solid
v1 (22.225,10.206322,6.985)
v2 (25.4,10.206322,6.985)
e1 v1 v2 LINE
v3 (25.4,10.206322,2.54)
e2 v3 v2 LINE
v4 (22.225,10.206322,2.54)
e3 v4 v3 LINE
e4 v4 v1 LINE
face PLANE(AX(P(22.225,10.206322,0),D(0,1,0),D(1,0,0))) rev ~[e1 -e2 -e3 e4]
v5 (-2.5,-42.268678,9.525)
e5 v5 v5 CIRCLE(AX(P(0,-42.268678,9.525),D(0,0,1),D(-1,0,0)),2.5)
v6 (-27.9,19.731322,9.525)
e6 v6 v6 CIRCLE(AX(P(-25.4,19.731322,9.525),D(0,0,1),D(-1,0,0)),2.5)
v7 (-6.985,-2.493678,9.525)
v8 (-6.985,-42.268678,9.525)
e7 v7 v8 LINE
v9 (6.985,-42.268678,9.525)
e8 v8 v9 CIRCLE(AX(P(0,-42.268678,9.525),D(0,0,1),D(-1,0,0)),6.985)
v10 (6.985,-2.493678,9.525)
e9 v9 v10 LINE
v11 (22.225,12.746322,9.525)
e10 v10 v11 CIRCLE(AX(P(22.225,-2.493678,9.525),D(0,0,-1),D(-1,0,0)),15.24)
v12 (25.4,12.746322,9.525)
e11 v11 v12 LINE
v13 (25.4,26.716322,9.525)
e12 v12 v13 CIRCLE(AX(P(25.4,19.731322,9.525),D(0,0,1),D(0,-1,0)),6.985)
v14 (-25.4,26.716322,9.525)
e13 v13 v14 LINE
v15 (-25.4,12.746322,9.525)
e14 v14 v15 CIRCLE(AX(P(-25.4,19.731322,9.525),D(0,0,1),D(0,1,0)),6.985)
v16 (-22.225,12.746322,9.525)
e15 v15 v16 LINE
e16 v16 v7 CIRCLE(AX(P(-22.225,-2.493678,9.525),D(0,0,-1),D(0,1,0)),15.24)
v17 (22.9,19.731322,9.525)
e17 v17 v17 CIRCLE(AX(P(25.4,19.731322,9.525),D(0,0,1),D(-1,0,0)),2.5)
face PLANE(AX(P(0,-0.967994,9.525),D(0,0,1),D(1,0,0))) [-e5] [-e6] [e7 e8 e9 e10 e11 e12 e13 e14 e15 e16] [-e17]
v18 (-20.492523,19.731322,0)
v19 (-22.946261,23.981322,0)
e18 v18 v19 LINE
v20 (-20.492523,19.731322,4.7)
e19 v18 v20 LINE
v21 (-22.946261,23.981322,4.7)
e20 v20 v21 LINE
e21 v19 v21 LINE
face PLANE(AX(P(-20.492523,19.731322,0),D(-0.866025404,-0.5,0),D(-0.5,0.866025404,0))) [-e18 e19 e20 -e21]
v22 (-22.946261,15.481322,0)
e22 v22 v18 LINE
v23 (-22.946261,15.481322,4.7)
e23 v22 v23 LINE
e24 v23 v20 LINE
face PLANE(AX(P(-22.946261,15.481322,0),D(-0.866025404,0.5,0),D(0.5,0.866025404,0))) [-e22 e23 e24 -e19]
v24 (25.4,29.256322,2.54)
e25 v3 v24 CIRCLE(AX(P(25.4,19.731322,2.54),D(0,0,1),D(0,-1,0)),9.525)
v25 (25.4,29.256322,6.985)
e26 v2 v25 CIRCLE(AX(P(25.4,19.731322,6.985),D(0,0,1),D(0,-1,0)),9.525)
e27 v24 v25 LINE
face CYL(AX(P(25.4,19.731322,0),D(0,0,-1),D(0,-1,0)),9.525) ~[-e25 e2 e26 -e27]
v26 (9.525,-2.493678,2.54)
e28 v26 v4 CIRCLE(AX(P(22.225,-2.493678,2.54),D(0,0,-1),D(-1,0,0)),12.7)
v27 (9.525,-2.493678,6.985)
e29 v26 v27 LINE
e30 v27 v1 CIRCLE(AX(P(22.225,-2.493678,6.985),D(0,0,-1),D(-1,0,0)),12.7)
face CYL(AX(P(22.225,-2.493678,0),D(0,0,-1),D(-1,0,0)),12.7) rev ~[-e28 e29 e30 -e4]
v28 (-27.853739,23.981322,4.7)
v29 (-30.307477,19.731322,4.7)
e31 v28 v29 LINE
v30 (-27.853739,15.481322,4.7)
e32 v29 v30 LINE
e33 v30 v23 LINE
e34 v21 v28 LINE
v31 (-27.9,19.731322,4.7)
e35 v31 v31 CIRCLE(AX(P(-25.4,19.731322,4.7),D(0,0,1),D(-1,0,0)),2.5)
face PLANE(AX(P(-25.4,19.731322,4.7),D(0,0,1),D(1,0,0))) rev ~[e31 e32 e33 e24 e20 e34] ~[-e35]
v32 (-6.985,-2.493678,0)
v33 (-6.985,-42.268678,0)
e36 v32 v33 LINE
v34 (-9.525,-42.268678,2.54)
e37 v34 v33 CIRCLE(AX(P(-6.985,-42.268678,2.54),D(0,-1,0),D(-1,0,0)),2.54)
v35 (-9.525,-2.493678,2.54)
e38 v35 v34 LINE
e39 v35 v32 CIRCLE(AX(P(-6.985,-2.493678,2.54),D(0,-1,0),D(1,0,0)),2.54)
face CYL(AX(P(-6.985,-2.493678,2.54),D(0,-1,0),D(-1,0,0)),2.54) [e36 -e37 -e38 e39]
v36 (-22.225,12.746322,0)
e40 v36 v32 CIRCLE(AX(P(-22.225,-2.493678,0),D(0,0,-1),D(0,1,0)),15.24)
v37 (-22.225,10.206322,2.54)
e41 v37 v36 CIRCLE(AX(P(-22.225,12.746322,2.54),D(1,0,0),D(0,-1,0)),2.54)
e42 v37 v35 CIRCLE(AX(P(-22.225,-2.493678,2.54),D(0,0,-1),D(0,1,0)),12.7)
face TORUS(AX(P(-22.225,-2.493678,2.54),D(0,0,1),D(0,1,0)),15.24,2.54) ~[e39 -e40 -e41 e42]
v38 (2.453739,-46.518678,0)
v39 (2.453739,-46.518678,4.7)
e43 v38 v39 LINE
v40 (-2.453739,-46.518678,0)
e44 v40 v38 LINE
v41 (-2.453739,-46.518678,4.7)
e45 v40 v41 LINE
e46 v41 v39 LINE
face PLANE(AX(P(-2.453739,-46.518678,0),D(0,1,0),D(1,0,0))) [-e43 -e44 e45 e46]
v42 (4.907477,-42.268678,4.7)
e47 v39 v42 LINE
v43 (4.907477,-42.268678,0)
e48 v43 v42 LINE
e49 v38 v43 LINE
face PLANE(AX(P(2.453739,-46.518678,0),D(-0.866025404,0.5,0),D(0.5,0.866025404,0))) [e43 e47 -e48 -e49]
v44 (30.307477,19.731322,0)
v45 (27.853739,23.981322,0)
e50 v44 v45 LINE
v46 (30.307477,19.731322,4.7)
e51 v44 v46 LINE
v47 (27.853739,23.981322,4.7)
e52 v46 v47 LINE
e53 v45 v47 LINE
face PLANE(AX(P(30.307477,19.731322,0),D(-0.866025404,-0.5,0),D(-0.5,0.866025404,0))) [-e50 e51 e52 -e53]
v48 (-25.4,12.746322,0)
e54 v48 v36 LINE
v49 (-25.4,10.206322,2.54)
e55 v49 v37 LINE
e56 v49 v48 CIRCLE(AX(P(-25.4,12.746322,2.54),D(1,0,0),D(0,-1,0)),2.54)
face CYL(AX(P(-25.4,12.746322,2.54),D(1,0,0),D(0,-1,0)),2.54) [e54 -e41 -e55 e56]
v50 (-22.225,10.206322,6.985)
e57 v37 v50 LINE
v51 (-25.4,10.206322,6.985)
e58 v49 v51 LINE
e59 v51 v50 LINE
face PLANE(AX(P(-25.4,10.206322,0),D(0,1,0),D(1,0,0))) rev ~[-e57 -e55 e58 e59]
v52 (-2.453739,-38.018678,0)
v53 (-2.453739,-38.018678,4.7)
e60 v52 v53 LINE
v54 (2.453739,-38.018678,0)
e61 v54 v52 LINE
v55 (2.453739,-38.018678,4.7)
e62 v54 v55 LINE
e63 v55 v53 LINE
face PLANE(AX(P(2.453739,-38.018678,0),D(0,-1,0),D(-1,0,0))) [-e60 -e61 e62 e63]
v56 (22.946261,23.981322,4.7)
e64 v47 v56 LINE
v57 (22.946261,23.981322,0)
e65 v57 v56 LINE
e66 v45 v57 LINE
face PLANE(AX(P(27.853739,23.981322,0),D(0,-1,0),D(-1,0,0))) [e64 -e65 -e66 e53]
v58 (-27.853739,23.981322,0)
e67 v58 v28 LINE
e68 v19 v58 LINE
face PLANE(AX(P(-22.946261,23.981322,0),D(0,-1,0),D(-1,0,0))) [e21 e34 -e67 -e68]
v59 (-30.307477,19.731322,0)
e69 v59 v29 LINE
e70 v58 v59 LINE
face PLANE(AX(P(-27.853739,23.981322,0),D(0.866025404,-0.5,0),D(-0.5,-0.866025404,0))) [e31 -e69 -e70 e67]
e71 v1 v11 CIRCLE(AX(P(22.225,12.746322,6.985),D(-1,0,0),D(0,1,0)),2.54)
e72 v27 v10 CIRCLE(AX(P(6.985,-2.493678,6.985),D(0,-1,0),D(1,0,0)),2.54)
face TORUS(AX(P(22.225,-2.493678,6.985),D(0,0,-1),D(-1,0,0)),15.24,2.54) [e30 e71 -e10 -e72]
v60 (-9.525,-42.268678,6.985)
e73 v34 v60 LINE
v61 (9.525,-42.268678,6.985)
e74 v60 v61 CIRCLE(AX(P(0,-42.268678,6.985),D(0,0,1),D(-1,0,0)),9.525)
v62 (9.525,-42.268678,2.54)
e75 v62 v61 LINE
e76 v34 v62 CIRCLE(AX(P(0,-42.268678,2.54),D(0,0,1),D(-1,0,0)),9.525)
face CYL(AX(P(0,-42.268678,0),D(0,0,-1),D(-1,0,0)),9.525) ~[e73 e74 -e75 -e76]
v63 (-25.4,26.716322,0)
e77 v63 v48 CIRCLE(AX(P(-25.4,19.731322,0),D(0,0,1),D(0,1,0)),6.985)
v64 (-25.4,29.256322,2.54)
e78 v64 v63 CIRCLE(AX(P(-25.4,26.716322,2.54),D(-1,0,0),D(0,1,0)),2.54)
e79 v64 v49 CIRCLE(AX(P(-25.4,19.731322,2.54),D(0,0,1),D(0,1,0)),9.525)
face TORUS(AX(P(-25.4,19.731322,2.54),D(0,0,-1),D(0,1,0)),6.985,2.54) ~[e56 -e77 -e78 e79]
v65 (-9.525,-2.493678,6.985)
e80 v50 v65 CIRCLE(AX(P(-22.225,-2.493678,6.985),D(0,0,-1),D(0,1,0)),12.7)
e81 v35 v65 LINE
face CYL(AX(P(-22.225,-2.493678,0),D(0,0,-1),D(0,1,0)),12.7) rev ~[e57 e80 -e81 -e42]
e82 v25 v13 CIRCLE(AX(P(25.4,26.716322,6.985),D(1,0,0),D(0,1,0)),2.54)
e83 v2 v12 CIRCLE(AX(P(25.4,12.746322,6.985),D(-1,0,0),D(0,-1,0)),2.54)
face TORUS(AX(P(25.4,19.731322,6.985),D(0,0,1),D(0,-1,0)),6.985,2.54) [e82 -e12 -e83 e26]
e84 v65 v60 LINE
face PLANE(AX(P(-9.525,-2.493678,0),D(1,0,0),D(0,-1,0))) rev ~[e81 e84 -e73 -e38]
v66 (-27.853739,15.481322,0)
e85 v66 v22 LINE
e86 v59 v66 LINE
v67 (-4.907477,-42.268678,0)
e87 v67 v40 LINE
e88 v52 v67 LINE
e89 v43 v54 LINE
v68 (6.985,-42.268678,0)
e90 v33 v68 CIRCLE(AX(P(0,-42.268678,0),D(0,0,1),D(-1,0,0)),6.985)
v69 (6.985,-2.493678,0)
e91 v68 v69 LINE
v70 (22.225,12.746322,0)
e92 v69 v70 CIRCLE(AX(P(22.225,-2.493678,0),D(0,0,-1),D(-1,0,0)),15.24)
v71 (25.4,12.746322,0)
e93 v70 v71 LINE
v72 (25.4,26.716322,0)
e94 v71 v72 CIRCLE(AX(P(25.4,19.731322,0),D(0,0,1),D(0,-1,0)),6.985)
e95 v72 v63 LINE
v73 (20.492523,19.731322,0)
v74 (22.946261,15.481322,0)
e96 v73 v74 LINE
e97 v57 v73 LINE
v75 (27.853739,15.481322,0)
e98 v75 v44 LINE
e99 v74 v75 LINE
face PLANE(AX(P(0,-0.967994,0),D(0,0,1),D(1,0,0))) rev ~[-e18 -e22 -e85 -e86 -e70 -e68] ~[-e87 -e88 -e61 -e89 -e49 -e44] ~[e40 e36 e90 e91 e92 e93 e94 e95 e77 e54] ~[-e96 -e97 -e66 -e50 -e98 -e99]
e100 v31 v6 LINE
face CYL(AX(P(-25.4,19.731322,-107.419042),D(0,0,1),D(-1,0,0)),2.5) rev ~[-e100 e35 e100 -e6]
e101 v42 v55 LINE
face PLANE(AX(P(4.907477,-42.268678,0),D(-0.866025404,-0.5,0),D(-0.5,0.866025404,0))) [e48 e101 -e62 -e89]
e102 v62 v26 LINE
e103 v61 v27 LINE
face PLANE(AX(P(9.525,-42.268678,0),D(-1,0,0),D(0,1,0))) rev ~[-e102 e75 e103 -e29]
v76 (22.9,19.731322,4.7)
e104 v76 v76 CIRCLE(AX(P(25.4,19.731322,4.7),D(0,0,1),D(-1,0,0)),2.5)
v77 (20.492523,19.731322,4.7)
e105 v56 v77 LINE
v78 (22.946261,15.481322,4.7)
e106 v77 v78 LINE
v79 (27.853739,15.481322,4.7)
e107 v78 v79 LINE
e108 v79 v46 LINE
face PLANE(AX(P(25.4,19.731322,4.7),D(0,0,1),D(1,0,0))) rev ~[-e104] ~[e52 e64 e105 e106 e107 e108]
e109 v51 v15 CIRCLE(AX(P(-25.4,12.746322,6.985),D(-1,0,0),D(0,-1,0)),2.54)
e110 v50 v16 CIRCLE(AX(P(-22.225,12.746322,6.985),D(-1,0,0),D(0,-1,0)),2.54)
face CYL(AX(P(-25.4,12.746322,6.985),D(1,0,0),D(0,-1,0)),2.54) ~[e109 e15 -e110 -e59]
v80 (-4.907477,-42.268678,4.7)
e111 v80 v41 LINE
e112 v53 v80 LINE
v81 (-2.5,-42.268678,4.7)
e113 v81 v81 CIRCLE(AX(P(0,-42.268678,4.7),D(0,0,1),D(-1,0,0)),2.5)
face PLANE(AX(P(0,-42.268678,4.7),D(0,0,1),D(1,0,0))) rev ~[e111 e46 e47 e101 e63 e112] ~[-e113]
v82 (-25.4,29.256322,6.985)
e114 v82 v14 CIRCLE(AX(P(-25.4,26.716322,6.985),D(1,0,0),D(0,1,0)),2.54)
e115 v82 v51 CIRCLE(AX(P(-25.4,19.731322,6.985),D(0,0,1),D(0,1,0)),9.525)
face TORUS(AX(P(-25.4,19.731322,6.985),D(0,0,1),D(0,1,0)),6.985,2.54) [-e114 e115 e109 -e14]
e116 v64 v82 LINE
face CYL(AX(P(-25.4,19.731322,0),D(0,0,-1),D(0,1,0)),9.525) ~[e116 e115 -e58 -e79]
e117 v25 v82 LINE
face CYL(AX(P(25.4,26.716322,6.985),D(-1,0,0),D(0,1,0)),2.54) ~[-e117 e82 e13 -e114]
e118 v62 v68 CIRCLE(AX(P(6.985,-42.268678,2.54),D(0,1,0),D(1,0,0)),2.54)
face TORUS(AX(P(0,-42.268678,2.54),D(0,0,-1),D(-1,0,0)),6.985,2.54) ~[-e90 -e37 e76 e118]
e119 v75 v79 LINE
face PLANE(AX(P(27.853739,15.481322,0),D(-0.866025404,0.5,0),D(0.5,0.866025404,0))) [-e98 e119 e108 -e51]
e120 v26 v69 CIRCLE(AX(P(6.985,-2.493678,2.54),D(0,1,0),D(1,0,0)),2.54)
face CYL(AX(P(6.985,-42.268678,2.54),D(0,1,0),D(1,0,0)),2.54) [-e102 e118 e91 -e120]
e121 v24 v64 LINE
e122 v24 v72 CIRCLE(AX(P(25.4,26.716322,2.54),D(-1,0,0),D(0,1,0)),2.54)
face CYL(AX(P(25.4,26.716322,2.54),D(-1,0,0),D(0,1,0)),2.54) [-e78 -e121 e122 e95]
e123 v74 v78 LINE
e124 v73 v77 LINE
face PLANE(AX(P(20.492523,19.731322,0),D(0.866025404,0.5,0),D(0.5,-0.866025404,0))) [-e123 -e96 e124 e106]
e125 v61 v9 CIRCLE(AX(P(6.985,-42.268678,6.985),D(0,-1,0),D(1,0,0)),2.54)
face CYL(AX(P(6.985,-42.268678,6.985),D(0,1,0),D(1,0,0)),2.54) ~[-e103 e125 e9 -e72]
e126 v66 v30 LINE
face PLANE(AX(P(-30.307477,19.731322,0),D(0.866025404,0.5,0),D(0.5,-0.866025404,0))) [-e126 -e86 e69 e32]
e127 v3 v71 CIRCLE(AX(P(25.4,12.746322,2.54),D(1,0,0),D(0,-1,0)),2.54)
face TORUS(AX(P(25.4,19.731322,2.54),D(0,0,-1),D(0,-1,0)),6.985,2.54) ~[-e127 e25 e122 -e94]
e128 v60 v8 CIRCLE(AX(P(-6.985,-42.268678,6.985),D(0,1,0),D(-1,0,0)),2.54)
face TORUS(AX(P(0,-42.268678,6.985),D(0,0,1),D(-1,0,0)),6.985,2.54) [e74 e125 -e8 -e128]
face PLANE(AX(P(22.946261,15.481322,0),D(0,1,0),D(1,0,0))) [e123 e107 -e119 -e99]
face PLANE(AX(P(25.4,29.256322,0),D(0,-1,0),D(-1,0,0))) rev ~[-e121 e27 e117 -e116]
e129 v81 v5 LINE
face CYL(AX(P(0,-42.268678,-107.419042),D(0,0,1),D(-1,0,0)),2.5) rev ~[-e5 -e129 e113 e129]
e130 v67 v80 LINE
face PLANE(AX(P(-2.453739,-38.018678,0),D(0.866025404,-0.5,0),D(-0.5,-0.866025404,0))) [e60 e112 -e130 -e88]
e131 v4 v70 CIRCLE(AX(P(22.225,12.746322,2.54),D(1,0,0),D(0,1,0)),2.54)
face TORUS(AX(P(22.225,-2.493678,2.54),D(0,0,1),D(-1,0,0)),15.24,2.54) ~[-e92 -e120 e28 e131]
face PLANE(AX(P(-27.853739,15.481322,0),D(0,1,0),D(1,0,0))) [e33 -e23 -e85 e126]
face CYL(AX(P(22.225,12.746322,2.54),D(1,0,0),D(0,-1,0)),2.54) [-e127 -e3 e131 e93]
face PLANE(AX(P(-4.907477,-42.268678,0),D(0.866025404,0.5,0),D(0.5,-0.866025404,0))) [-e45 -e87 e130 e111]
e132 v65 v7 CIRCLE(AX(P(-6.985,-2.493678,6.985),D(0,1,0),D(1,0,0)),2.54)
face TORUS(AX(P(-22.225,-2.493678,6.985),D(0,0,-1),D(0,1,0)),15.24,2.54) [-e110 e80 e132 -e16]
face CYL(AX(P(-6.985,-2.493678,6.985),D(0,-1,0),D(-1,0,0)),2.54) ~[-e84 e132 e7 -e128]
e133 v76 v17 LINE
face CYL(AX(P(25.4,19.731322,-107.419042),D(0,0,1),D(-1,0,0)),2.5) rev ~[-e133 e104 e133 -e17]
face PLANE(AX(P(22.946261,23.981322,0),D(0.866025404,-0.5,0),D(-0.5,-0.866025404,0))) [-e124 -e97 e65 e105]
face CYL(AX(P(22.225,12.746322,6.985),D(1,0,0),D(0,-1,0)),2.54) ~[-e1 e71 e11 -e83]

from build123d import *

# Parameters (mm, degrees)
F1_DEPTH = 9.525
F2_D     = 5
F3_R     = 2.54
F4_DEPTH = 4.7


# Not quite as in the source:
# - a feature names something its author has since deleted; it is built from what else it names


with BuildPart() as f1:
    # F0 (on Top) → F1 (new body)
    with BuildSketch(Plane.XY):
        with BuildLine():
            Line((25.4, 29.2563221224), (-25.4, 29.2563221224))
            ThreePointArc((-25.4, 29.2563221224), (-34.925, 19.7313221224), (-25.4, 10.2063221224))
            Line((-25.4, 10.2063221224), (-22.225, 10.2063221224))
            ThreePointArc((-22.225, 10.2063221224), (-13.2447438789, 6.4865782435), (-9.525, -2.4936778776))
            Line((-9.525, -2.4936778776), (-9.525, -42.2686778776))
            ThreePointArc((-9.525, -42.2686778776), (0, -51.7936778776), (9.525, -42.2686778776))
            Line((9.525, -42.2686778776), (9.525, -2.4936778776))
            ThreePointArc((9.525, -2.4936778776), (13.2447438789, 6.4865782435), (22.225, 10.2063221224))
            Line((22.225, 10.2063221224), (25.4, 10.2063221224))
            ThreePointArc((25.4, 10.2063221224), (34.925, 19.7313221224), (25.4, 29.2563221224))
        make_face()
        Polygon((-4.9074772881, -42.2686778776), (-2.4537386441, -38.0186778776), (2.4537386441, -38.0186778776), (4.9074772881, -42.2686778776), (2.4537386441, -46.5186778776), (-2.4537386441, -46.5186778776), align=None, mode=Mode.SUBTRACT)
        Polygon((-20.4925227119, 19.7313221224), (-22.9462613559, 15.4813221224), (-27.8537386441, 15.4813221224), (-30.3074772881, 19.7313221224), (-27.8537386441, 23.9813221224), (-22.9462613559, 23.9813221224), align=None, mode=Mode.SUBTRACT)
        Polygon((30.3074772881, 19.7313221224), (27.8537386441, 15.4813221224), (22.9462613559, 15.4813221224), (20.4925227119, 19.7313221224), (22.9462613559, 23.9813221224), (27.8537386441, 23.9813221224), align=None, mode=Mode.SUBTRACT)
        Polygon((2.4537386441, -38.0186778776), (-2.4537386441, -38.0186778776), (-4.9074772881, -42.2686778776), (-2.4537386441, -46.5186778776), (2.4537386441, -46.5186778776), (4.9074772881, -42.2686778776), align=None)
        Polygon((-27.8537386441, 15.4813221224), (-22.9462613559, 15.4813221224), (-20.4925227119, 19.7313221224), (-22.9462613559, 23.9813221224), (-27.8537386441, 23.9813221224), (-30.3074772881, 19.7313221224), align=None)
        Polygon((22.9462613559, 15.4813221224), (27.8537386441, 15.4813221224), (30.3074772881, 19.7313221224), (27.8537386441, 23.9813221224), (22.9462613559, 23.9813221224), (20.4925227119, 19.7313221224), align=None)
    extrude(amount=F1_DEPTH)

    # F2 (through all)
    with Locations(Plane(origin=(0, 0, 0), x_dir=(1, 0, 0), z_dir=(0, 0, -1))):
        with Locations((25.4, -19.7313221224), (-25.4, -19.7313221224), (0, 42.2686778776)):
            Hole(F2_D / 2)

    # F3
    f3_edges = [f1.edges().sort_by_distance(p)[0] for p in [
        (0, 29.256322, 0),
        (0, 29.256322, 9.525),
    ]]
    fillet(f3_edges, radius=F3_R)

    # F0 (on Top) → F4 (cut)
    with BuildSketch(Plane.XY):
        Polygon((2.4537386441, -38.0186778776), (-2.4537386441, -38.0186778776), (-4.9074772881, -42.2686778776), (-2.4537386441, -46.5186778776), (2.4537386441, -46.5186778776), (4.9074772881, -42.2686778776), align=None)
        Polygon((-27.8537386441, 15.4813221224), (-22.9462613559, 15.4813221224), (-20.4925227119, 19.7313221224), (-22.9462613559, 23.9813221224), (-27.8537386441, 23.9813221224), (-30.3074772881, 19.7313221224), align=None)
        Polygon((22.9462613559, 15.4813221224), (27.8537386441, 15.4813221224), (30.3074772881, 19.7313221224), (27.8537386441, 23.9813221224), (22.9462613559, 23.9813221224), (20.4925227119, 19.7313221224), align=None)
    extrude(amount=F4_DEPTH, mode=Mode.SUBTRACT)


solid = f1.part
